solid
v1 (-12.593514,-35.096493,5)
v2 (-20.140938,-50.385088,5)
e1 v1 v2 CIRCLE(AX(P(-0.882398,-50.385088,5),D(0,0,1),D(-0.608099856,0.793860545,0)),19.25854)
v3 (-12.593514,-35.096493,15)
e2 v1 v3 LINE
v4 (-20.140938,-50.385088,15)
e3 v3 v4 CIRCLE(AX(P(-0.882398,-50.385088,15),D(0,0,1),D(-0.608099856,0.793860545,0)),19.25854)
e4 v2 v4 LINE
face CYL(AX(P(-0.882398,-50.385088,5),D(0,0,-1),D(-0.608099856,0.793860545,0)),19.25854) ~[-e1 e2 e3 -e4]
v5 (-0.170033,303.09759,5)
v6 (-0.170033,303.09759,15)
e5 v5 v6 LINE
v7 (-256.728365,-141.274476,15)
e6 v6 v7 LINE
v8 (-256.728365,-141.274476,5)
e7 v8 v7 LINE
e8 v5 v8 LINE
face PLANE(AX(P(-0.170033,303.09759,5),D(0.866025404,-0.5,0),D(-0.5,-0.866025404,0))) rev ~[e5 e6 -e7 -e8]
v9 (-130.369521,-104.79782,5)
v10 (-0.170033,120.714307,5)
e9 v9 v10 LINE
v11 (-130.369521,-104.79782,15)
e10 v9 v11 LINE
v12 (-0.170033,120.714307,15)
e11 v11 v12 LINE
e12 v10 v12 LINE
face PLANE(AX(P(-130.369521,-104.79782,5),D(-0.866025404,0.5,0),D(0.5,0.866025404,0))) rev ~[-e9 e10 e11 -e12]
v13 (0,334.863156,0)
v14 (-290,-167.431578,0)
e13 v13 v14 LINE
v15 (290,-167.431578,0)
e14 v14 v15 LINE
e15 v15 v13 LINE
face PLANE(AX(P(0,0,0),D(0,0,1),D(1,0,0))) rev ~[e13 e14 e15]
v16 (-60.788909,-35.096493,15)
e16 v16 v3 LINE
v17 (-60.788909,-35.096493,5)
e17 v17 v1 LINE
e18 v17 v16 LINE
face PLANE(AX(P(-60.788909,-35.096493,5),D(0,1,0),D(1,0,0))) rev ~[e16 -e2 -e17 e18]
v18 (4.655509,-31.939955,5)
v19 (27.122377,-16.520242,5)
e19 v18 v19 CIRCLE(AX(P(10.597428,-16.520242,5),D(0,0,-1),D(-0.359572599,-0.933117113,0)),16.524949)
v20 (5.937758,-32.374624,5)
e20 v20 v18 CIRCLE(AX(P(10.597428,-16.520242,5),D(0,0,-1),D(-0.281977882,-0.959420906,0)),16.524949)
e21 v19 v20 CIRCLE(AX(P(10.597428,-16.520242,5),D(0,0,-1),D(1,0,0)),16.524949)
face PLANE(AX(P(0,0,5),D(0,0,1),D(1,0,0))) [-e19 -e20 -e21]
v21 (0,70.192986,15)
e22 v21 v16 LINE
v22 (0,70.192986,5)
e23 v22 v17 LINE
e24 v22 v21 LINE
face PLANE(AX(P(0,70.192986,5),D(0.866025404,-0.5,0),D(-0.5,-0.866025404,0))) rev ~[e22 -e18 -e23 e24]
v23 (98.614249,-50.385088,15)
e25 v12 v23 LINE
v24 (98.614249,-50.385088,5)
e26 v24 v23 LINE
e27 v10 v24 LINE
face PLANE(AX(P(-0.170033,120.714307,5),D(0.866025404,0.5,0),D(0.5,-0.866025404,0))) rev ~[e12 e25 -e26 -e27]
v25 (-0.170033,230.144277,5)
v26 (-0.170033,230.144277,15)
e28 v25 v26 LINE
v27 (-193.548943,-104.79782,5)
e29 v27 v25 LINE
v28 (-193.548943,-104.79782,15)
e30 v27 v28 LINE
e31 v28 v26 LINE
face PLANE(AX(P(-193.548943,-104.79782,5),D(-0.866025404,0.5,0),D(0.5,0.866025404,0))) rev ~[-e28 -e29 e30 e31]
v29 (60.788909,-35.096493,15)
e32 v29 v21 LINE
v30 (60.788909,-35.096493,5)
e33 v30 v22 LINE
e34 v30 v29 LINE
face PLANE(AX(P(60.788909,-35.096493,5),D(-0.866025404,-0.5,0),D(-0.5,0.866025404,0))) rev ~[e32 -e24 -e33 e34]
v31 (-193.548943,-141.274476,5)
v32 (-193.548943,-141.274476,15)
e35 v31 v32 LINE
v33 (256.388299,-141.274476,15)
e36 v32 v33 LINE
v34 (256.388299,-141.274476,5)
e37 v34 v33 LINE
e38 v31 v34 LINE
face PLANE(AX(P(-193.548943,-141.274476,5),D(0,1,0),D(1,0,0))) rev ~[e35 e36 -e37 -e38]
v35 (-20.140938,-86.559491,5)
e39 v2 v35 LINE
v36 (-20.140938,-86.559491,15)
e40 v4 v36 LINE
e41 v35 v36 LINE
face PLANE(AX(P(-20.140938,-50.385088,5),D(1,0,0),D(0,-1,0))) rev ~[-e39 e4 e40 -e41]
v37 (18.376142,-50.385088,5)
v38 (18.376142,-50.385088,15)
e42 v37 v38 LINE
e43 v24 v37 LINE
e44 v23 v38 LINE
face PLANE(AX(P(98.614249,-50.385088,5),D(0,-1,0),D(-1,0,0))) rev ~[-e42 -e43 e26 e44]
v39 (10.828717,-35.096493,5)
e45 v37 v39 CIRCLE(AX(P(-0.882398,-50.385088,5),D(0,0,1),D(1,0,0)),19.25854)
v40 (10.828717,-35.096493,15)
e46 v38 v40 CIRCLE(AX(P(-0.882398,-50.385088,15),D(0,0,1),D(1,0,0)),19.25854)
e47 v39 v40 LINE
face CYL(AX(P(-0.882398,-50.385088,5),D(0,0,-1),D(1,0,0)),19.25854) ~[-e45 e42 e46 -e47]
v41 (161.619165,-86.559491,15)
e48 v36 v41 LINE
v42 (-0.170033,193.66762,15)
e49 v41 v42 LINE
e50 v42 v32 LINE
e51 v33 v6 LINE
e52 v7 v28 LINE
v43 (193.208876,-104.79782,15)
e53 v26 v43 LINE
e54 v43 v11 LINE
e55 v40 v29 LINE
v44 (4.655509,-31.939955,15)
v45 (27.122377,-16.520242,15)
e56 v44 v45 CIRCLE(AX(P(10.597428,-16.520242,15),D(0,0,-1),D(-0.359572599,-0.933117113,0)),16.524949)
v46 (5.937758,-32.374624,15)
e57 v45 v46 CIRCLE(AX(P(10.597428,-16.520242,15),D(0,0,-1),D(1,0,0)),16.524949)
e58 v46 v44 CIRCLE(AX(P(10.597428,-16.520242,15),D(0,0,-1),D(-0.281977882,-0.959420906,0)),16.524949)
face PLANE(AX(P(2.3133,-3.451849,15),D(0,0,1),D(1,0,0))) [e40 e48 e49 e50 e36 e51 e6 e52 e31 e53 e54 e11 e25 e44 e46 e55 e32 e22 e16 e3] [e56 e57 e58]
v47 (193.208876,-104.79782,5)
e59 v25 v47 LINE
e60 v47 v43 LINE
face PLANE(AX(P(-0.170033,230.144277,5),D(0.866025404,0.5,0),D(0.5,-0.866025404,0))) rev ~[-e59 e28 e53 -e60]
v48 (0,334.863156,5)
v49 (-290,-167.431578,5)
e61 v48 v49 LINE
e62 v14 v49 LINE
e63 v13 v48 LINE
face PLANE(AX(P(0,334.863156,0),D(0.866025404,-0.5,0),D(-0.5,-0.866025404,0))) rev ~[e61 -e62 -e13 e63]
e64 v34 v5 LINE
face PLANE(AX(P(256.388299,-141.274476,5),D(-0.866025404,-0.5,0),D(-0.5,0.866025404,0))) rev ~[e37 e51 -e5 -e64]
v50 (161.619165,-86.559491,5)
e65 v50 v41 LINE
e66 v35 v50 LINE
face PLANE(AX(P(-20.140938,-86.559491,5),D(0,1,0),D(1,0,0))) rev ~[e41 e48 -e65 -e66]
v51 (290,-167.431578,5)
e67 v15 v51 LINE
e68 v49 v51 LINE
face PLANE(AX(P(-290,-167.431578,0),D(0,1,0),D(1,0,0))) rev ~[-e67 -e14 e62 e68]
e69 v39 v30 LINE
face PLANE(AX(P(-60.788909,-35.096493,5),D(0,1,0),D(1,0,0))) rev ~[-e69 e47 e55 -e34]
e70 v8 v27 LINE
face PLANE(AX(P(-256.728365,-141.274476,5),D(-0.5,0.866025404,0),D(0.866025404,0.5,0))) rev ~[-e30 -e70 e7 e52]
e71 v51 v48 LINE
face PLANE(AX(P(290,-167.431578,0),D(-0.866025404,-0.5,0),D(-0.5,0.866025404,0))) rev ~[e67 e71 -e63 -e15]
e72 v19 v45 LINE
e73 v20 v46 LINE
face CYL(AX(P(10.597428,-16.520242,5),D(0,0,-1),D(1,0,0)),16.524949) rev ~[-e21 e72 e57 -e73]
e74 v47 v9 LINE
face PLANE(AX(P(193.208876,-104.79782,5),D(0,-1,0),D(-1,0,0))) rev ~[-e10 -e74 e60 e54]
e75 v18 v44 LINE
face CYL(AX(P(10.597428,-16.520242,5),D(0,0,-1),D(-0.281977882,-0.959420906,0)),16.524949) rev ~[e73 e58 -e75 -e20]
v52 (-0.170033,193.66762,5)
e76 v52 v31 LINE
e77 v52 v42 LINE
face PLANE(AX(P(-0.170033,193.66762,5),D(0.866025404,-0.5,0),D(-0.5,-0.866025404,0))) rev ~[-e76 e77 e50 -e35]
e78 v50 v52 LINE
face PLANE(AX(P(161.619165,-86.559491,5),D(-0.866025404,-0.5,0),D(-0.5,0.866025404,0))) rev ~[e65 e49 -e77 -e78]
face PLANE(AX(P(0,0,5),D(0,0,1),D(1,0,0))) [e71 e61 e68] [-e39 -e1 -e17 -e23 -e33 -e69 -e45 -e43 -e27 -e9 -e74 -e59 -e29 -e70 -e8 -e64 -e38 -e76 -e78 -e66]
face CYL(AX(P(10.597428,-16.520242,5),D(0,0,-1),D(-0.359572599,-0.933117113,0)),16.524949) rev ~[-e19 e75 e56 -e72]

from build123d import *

# Parameters (mm, degrees)
F1_DEPTH = 5
F3_DEPTH = 10
F4_DEPTH = 10


# Not quite as in the source:
# - a feature names something its author has since deleted; it is built from what else it names


with BuildPart() as f1:
    # F0 (on Top) → F1 (new body)
    with BuildSketch(Plane.XY):
        Polygon((290, -167.431578065), (0, 334.86315613), (-290, -167.431578065), align=None)
    extrude(amount=F1_DEPTH)

    # F2 (on face) → F3 (join)
    with BuildSketch(Plane.XY.offset(5)):
        with BuildLine():
            Line((256.3882985588, -141.2744761391), (-0.1700333609, 303.0975898508))
            Line((-0.1700333609, 303.0975898508), (-256.7283652805, -141.2744761391))
            Line((-256.7283652805, -141.2744761391), (-193.5489429105, -104.7978196266))
            Line((-193.5489429105, -104.7978196266), (-0.1700333609, 230.1442768257))
            Line((-0.1700333609, 230.1442768257), (193.2088761888, -104.7978196266))
            Line((193.2088761888, -104.7978196266), (-130.3695205406, -104.7978196266))
            Line((-130.3695205406, -104.7978196266), (-0.1700333609, 120.7143072881))
            Line((-0.1700333609, 120.7143072881), (98.6142485835, -50.3850880286))
            Line((98.6142485835, -50.3850880286), (18.3761417155, -50.3850880286))
            ThreePointArc((18.3761417155, -50.3850880286), (16.3865094235, -41.8600549069), (10.8287170908, -35.0964929185))
            Line((10.8287170908, -35.0964929185), (-12.5935137719, -35.0964929185))
            ThreePointArc((-12.5935137719, -35.0964929185), (-18.1513061046, -41.8600549069), (-20.1409383966, -50.3850880286))
            Line((-20.1409383966, -50.3850880286), (-20.1409383966, -86.5594913703))
            Line((-20.1409383966, -86.5594913703), (161.6191650039, -86.5594913703))
            Line((161.6191650039, -86.5594913703), (-0.1700333609, 193.6676203132))
            Line((-0.1700333609, 193.6676203132), (-193.5489429105, -141.2744761391))
            Line((-193.5489429105, -141.2744761391), (256.3882985588, -141.2744761391))
        make_face()
    extrude(amount=F3_DEPTH)

    # F2 (on face) → F4 (join)
    with BuildSketch(Plane.XY.offset(5)):
        with BuildLine():
            Line((-60.7889089023, -35.0964929185), (-12.5935137719, -35.0964929185))
            ThreePointArc((-12.5935137719, -35.0964929185), (-7.065251394, -32.1460175148), (-0.8823983405, -31.1265479726))
            ThreePointArc((-0.8823983405, -31.1265479726), (1.9162643927, -31.3309847436), (4.6555093745, -31.9399547076))
            ThreePointArc((4.6555093745, -31.9399547076), (1.2463845952, -2.8955610808), (27.1223774556, -16.5202418624))
            ThreePointArc((27.1223774556, -16.5202418624), (20.4987699273, -29.7504111213), (5.9377581342, -32.3746235496))
            ThreePointArc((5.9377581342, -32.3746235496), (8.4826511964, -33.5569208004), (10.8287170908, -35.0964929185))
            Line((10.8287170908, -35.0964929185), (60.7889089023, -35.0964929185))
            Line((60.7889089023, -35.0964929185), (0, 70.1929858369))
            Line((0, 70.1929858369), (-60.7889089023, -35.0964929185))
        make_face()
        with BuildLine():
            ThreePointArc((-0.8823983405, -31.1265479726), (-7.065251394, -32.1460175148), (-12.5935137719, -35.0964929185))
            Line((-12.5935137719, -35.0964929185), (10.8287170908, -35.0964929185))
            ThreePointArc((10.8287170908, -35.0964929185), (8.4826511964, -33.5569208004), (5.9377581342, -32.3746235496))
            ThreePointArc((5.9377581342, -32.3746235496), (5.2921802317, -32.1704267711), (4.6555093745, -31.9399547076))
            ThreePointArc((4.6555093745, -31.9399547076), (1.9162643927, -31.3309847436), (-0.8823983405, -31.1265479726))
        make_face()
    extrude(amount=F4_DEPTH)


solid = f1.part
